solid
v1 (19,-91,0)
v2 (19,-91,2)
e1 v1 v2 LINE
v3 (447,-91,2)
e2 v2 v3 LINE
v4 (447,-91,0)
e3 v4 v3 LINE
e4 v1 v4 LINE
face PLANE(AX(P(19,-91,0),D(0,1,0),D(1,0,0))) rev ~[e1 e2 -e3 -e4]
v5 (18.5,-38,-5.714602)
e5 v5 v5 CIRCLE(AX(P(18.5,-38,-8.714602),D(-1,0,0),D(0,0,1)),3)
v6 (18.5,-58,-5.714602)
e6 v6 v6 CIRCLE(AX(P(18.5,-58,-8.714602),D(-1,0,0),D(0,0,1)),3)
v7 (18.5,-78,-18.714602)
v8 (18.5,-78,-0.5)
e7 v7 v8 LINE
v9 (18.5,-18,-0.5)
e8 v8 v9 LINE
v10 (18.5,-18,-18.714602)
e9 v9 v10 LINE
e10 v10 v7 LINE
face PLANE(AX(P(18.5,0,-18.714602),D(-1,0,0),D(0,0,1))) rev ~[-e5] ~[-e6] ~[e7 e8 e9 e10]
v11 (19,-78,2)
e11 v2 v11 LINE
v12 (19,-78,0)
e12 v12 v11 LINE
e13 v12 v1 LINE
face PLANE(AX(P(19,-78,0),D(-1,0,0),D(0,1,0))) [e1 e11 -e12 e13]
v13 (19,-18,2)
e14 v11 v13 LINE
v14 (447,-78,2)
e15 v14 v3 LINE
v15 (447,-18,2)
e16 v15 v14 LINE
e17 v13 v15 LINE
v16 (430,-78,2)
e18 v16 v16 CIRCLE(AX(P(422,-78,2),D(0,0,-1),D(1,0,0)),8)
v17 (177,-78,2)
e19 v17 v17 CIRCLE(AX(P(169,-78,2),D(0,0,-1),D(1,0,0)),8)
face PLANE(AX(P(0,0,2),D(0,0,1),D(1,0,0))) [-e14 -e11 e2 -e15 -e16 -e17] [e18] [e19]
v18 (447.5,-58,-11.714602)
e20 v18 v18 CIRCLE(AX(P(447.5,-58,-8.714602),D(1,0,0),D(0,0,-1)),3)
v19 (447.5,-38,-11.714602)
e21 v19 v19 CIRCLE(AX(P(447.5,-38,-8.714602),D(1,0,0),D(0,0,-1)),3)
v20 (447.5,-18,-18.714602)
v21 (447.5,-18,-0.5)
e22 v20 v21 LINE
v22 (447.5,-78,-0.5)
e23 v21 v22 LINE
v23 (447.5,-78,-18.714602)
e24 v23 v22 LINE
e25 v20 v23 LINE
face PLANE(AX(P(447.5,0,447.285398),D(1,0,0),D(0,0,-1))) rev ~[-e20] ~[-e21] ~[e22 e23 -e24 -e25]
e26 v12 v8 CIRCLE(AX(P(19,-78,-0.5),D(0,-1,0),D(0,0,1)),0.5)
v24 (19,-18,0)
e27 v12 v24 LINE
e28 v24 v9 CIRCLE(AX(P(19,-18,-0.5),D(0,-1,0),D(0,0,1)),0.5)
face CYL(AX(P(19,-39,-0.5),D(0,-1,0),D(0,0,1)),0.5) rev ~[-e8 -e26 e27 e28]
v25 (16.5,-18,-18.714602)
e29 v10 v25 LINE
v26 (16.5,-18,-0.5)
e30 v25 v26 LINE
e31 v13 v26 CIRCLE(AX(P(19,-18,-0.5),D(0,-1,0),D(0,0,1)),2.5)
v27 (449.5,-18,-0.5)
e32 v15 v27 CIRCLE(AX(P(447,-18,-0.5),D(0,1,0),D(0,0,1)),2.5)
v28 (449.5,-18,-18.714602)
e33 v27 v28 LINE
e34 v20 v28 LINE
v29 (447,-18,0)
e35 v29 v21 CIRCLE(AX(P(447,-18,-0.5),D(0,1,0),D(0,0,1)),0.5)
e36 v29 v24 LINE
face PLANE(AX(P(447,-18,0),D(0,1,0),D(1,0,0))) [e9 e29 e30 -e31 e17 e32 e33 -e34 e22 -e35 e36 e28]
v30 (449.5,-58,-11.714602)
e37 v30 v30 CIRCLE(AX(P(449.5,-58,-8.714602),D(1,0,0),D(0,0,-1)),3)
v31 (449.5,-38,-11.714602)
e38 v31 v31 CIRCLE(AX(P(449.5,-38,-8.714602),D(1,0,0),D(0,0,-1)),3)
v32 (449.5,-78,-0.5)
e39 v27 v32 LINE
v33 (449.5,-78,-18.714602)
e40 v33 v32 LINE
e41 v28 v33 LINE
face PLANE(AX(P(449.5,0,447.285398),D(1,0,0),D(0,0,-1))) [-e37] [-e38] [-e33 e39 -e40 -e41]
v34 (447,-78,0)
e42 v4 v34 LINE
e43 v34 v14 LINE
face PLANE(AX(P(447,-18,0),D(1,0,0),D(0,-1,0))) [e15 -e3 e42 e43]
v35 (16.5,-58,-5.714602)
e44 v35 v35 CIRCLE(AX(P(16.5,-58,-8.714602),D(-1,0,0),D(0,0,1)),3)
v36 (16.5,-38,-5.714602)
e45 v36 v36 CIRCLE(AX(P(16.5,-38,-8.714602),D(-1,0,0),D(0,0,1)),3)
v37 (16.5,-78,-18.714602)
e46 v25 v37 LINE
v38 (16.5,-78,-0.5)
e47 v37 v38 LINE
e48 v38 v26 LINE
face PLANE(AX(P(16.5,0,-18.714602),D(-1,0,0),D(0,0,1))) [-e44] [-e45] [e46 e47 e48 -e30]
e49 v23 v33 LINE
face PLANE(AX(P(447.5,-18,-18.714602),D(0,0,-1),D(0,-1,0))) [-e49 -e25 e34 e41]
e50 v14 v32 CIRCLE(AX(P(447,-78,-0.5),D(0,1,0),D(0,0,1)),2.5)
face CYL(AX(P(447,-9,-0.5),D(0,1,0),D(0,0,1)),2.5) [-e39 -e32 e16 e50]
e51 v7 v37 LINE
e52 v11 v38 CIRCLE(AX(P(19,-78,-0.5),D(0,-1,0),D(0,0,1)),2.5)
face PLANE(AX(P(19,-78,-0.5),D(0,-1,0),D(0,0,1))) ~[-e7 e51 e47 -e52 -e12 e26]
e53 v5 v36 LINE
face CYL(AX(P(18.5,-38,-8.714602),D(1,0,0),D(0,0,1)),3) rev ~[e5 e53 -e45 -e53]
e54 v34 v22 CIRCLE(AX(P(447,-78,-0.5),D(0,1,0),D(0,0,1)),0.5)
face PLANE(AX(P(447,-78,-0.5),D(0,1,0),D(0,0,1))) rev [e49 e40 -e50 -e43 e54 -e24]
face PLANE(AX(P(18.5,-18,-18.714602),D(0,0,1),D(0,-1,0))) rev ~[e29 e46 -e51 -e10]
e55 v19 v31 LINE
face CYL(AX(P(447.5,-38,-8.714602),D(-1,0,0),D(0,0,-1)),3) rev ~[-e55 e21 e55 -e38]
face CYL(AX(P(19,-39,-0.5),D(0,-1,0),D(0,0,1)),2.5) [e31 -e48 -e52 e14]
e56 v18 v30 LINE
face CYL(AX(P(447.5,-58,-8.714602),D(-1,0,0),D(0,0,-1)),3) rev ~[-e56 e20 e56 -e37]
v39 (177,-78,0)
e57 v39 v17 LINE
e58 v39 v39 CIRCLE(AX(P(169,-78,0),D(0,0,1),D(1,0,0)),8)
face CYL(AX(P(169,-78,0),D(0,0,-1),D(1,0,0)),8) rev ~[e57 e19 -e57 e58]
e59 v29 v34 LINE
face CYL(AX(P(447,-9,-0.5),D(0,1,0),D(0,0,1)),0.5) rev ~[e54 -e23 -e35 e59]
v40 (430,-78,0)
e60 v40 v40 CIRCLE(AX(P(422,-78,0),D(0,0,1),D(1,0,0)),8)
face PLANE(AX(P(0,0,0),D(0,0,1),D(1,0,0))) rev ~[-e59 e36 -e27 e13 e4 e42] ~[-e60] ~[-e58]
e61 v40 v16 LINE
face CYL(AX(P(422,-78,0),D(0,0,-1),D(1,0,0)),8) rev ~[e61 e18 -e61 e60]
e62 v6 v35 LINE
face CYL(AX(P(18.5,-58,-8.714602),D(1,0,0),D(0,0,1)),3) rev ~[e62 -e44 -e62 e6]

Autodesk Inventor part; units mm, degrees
ref_plane "YZ Plane" through (0, 0, 0) normal (1, 0, 0) x (0, 1, 0)
ref_plane "XZ Plane" through (0, 0, 0) normal (0, 1, 0) x (-1, 0, 0)
ref_plane "XY Plane" through (0, 0, 0) normal (0, 0, 1) x (1, 0, 0)
sketch "Sketch1" plane through (0, 0, 0) normal (0, 0, 1) x (1, 0, 0)
  line L0 (0, -18) -> (0, -78)
  line L1 (0, -78) -> (19, -78)
  line L2 (19, -78) -> (19, -18)
  line L3 (19, -18) -> (0, -18)
  line L4 (19, -18) -> (447, -18)
  line L5 (447, -18) -> (447, -78)
  line L6 (447, -78) -> (19, -78)
  line L7 (447, -18) -> (466, -18)
  line L8 (466, -18) -> (466, -78)
  line L9 (466, -78) -> (447, -78)
  circle A0 centre (10, -58) radius 3
  circle A1 centre (10, -38) radius 3
  circle A2 centre (456, -58) radius 3
  circle A3 centre (456, -38) radius 3
  line L10 (19, -78) -> (19, -91)
  line L11 (19, -91) -> (447, -91)
  line L12 (447, -91) -> (447, -78)
  circle A4 centre (169, -78) radius 8
  circle A5 centre (422, -78) radius 8
  dimension "d0" = 60
  dimension "d1" = 19
  dimension "d2" = 428
  dimension "d3" = 19
  dimension "d10" = 6
  dimension "d11" = 6
  dimension "d12" = 20
  dimension "d13" = 20
  dimension "d14" = 6
  dimension "d15" = 6
  dimension "d16" = 20
  dimension "d17" = 20
  dimension "d24" = 13
  dimension "d25" = 428
  dimension "d27" = 10
  dimension "d28" = 10
  dimension "d29" = 10
  dimension "d30" = 10
  dimension "d32" = 16
  dimension "d33" = 13
  dimension "d34" = 150
  dimension "d35" = 16
  dimension "d36" = 25
extrude "Extrusion1" add sketch "Sketch1" along normal blind 2 contours L3 L2 L1 L0
extrude "Extrusion2" add sketch "Sketch1" along normal blind 2 contours L4 L5 L6 A5 A4 L2 | L6 A4 A5 L12 L11 L10
extrude "Extrusion3" add sketch "Sketch1" along normal blind 2 contours L7 L8 L9 L5
bend part "Bend Part2" radius 0.5 angle 90 line through (447, -18, 0) along (0, -1, 0) centre toward (0, 0, -1) moving side (1, 0, 0) both sides no
bend part "Bend Part3" radius 0.5 angle 90 line through (19, -78, 0) along (0, 1, 0) centre toward (0, 0, -1) moving side (-1, 0, 0) both sides no
equation "\"d1\" = d3"
equation "\"d12\" = d13"
equation "\"d16\" = d13"
equation "\"d17\" = d13"
equation "\"d25\" = d2"
equation "\"d28\" = d27"
equation "\"d29\" = d27"
properties part number "Chapa de Refrigeración" material "Aluminum 1100-H14"
